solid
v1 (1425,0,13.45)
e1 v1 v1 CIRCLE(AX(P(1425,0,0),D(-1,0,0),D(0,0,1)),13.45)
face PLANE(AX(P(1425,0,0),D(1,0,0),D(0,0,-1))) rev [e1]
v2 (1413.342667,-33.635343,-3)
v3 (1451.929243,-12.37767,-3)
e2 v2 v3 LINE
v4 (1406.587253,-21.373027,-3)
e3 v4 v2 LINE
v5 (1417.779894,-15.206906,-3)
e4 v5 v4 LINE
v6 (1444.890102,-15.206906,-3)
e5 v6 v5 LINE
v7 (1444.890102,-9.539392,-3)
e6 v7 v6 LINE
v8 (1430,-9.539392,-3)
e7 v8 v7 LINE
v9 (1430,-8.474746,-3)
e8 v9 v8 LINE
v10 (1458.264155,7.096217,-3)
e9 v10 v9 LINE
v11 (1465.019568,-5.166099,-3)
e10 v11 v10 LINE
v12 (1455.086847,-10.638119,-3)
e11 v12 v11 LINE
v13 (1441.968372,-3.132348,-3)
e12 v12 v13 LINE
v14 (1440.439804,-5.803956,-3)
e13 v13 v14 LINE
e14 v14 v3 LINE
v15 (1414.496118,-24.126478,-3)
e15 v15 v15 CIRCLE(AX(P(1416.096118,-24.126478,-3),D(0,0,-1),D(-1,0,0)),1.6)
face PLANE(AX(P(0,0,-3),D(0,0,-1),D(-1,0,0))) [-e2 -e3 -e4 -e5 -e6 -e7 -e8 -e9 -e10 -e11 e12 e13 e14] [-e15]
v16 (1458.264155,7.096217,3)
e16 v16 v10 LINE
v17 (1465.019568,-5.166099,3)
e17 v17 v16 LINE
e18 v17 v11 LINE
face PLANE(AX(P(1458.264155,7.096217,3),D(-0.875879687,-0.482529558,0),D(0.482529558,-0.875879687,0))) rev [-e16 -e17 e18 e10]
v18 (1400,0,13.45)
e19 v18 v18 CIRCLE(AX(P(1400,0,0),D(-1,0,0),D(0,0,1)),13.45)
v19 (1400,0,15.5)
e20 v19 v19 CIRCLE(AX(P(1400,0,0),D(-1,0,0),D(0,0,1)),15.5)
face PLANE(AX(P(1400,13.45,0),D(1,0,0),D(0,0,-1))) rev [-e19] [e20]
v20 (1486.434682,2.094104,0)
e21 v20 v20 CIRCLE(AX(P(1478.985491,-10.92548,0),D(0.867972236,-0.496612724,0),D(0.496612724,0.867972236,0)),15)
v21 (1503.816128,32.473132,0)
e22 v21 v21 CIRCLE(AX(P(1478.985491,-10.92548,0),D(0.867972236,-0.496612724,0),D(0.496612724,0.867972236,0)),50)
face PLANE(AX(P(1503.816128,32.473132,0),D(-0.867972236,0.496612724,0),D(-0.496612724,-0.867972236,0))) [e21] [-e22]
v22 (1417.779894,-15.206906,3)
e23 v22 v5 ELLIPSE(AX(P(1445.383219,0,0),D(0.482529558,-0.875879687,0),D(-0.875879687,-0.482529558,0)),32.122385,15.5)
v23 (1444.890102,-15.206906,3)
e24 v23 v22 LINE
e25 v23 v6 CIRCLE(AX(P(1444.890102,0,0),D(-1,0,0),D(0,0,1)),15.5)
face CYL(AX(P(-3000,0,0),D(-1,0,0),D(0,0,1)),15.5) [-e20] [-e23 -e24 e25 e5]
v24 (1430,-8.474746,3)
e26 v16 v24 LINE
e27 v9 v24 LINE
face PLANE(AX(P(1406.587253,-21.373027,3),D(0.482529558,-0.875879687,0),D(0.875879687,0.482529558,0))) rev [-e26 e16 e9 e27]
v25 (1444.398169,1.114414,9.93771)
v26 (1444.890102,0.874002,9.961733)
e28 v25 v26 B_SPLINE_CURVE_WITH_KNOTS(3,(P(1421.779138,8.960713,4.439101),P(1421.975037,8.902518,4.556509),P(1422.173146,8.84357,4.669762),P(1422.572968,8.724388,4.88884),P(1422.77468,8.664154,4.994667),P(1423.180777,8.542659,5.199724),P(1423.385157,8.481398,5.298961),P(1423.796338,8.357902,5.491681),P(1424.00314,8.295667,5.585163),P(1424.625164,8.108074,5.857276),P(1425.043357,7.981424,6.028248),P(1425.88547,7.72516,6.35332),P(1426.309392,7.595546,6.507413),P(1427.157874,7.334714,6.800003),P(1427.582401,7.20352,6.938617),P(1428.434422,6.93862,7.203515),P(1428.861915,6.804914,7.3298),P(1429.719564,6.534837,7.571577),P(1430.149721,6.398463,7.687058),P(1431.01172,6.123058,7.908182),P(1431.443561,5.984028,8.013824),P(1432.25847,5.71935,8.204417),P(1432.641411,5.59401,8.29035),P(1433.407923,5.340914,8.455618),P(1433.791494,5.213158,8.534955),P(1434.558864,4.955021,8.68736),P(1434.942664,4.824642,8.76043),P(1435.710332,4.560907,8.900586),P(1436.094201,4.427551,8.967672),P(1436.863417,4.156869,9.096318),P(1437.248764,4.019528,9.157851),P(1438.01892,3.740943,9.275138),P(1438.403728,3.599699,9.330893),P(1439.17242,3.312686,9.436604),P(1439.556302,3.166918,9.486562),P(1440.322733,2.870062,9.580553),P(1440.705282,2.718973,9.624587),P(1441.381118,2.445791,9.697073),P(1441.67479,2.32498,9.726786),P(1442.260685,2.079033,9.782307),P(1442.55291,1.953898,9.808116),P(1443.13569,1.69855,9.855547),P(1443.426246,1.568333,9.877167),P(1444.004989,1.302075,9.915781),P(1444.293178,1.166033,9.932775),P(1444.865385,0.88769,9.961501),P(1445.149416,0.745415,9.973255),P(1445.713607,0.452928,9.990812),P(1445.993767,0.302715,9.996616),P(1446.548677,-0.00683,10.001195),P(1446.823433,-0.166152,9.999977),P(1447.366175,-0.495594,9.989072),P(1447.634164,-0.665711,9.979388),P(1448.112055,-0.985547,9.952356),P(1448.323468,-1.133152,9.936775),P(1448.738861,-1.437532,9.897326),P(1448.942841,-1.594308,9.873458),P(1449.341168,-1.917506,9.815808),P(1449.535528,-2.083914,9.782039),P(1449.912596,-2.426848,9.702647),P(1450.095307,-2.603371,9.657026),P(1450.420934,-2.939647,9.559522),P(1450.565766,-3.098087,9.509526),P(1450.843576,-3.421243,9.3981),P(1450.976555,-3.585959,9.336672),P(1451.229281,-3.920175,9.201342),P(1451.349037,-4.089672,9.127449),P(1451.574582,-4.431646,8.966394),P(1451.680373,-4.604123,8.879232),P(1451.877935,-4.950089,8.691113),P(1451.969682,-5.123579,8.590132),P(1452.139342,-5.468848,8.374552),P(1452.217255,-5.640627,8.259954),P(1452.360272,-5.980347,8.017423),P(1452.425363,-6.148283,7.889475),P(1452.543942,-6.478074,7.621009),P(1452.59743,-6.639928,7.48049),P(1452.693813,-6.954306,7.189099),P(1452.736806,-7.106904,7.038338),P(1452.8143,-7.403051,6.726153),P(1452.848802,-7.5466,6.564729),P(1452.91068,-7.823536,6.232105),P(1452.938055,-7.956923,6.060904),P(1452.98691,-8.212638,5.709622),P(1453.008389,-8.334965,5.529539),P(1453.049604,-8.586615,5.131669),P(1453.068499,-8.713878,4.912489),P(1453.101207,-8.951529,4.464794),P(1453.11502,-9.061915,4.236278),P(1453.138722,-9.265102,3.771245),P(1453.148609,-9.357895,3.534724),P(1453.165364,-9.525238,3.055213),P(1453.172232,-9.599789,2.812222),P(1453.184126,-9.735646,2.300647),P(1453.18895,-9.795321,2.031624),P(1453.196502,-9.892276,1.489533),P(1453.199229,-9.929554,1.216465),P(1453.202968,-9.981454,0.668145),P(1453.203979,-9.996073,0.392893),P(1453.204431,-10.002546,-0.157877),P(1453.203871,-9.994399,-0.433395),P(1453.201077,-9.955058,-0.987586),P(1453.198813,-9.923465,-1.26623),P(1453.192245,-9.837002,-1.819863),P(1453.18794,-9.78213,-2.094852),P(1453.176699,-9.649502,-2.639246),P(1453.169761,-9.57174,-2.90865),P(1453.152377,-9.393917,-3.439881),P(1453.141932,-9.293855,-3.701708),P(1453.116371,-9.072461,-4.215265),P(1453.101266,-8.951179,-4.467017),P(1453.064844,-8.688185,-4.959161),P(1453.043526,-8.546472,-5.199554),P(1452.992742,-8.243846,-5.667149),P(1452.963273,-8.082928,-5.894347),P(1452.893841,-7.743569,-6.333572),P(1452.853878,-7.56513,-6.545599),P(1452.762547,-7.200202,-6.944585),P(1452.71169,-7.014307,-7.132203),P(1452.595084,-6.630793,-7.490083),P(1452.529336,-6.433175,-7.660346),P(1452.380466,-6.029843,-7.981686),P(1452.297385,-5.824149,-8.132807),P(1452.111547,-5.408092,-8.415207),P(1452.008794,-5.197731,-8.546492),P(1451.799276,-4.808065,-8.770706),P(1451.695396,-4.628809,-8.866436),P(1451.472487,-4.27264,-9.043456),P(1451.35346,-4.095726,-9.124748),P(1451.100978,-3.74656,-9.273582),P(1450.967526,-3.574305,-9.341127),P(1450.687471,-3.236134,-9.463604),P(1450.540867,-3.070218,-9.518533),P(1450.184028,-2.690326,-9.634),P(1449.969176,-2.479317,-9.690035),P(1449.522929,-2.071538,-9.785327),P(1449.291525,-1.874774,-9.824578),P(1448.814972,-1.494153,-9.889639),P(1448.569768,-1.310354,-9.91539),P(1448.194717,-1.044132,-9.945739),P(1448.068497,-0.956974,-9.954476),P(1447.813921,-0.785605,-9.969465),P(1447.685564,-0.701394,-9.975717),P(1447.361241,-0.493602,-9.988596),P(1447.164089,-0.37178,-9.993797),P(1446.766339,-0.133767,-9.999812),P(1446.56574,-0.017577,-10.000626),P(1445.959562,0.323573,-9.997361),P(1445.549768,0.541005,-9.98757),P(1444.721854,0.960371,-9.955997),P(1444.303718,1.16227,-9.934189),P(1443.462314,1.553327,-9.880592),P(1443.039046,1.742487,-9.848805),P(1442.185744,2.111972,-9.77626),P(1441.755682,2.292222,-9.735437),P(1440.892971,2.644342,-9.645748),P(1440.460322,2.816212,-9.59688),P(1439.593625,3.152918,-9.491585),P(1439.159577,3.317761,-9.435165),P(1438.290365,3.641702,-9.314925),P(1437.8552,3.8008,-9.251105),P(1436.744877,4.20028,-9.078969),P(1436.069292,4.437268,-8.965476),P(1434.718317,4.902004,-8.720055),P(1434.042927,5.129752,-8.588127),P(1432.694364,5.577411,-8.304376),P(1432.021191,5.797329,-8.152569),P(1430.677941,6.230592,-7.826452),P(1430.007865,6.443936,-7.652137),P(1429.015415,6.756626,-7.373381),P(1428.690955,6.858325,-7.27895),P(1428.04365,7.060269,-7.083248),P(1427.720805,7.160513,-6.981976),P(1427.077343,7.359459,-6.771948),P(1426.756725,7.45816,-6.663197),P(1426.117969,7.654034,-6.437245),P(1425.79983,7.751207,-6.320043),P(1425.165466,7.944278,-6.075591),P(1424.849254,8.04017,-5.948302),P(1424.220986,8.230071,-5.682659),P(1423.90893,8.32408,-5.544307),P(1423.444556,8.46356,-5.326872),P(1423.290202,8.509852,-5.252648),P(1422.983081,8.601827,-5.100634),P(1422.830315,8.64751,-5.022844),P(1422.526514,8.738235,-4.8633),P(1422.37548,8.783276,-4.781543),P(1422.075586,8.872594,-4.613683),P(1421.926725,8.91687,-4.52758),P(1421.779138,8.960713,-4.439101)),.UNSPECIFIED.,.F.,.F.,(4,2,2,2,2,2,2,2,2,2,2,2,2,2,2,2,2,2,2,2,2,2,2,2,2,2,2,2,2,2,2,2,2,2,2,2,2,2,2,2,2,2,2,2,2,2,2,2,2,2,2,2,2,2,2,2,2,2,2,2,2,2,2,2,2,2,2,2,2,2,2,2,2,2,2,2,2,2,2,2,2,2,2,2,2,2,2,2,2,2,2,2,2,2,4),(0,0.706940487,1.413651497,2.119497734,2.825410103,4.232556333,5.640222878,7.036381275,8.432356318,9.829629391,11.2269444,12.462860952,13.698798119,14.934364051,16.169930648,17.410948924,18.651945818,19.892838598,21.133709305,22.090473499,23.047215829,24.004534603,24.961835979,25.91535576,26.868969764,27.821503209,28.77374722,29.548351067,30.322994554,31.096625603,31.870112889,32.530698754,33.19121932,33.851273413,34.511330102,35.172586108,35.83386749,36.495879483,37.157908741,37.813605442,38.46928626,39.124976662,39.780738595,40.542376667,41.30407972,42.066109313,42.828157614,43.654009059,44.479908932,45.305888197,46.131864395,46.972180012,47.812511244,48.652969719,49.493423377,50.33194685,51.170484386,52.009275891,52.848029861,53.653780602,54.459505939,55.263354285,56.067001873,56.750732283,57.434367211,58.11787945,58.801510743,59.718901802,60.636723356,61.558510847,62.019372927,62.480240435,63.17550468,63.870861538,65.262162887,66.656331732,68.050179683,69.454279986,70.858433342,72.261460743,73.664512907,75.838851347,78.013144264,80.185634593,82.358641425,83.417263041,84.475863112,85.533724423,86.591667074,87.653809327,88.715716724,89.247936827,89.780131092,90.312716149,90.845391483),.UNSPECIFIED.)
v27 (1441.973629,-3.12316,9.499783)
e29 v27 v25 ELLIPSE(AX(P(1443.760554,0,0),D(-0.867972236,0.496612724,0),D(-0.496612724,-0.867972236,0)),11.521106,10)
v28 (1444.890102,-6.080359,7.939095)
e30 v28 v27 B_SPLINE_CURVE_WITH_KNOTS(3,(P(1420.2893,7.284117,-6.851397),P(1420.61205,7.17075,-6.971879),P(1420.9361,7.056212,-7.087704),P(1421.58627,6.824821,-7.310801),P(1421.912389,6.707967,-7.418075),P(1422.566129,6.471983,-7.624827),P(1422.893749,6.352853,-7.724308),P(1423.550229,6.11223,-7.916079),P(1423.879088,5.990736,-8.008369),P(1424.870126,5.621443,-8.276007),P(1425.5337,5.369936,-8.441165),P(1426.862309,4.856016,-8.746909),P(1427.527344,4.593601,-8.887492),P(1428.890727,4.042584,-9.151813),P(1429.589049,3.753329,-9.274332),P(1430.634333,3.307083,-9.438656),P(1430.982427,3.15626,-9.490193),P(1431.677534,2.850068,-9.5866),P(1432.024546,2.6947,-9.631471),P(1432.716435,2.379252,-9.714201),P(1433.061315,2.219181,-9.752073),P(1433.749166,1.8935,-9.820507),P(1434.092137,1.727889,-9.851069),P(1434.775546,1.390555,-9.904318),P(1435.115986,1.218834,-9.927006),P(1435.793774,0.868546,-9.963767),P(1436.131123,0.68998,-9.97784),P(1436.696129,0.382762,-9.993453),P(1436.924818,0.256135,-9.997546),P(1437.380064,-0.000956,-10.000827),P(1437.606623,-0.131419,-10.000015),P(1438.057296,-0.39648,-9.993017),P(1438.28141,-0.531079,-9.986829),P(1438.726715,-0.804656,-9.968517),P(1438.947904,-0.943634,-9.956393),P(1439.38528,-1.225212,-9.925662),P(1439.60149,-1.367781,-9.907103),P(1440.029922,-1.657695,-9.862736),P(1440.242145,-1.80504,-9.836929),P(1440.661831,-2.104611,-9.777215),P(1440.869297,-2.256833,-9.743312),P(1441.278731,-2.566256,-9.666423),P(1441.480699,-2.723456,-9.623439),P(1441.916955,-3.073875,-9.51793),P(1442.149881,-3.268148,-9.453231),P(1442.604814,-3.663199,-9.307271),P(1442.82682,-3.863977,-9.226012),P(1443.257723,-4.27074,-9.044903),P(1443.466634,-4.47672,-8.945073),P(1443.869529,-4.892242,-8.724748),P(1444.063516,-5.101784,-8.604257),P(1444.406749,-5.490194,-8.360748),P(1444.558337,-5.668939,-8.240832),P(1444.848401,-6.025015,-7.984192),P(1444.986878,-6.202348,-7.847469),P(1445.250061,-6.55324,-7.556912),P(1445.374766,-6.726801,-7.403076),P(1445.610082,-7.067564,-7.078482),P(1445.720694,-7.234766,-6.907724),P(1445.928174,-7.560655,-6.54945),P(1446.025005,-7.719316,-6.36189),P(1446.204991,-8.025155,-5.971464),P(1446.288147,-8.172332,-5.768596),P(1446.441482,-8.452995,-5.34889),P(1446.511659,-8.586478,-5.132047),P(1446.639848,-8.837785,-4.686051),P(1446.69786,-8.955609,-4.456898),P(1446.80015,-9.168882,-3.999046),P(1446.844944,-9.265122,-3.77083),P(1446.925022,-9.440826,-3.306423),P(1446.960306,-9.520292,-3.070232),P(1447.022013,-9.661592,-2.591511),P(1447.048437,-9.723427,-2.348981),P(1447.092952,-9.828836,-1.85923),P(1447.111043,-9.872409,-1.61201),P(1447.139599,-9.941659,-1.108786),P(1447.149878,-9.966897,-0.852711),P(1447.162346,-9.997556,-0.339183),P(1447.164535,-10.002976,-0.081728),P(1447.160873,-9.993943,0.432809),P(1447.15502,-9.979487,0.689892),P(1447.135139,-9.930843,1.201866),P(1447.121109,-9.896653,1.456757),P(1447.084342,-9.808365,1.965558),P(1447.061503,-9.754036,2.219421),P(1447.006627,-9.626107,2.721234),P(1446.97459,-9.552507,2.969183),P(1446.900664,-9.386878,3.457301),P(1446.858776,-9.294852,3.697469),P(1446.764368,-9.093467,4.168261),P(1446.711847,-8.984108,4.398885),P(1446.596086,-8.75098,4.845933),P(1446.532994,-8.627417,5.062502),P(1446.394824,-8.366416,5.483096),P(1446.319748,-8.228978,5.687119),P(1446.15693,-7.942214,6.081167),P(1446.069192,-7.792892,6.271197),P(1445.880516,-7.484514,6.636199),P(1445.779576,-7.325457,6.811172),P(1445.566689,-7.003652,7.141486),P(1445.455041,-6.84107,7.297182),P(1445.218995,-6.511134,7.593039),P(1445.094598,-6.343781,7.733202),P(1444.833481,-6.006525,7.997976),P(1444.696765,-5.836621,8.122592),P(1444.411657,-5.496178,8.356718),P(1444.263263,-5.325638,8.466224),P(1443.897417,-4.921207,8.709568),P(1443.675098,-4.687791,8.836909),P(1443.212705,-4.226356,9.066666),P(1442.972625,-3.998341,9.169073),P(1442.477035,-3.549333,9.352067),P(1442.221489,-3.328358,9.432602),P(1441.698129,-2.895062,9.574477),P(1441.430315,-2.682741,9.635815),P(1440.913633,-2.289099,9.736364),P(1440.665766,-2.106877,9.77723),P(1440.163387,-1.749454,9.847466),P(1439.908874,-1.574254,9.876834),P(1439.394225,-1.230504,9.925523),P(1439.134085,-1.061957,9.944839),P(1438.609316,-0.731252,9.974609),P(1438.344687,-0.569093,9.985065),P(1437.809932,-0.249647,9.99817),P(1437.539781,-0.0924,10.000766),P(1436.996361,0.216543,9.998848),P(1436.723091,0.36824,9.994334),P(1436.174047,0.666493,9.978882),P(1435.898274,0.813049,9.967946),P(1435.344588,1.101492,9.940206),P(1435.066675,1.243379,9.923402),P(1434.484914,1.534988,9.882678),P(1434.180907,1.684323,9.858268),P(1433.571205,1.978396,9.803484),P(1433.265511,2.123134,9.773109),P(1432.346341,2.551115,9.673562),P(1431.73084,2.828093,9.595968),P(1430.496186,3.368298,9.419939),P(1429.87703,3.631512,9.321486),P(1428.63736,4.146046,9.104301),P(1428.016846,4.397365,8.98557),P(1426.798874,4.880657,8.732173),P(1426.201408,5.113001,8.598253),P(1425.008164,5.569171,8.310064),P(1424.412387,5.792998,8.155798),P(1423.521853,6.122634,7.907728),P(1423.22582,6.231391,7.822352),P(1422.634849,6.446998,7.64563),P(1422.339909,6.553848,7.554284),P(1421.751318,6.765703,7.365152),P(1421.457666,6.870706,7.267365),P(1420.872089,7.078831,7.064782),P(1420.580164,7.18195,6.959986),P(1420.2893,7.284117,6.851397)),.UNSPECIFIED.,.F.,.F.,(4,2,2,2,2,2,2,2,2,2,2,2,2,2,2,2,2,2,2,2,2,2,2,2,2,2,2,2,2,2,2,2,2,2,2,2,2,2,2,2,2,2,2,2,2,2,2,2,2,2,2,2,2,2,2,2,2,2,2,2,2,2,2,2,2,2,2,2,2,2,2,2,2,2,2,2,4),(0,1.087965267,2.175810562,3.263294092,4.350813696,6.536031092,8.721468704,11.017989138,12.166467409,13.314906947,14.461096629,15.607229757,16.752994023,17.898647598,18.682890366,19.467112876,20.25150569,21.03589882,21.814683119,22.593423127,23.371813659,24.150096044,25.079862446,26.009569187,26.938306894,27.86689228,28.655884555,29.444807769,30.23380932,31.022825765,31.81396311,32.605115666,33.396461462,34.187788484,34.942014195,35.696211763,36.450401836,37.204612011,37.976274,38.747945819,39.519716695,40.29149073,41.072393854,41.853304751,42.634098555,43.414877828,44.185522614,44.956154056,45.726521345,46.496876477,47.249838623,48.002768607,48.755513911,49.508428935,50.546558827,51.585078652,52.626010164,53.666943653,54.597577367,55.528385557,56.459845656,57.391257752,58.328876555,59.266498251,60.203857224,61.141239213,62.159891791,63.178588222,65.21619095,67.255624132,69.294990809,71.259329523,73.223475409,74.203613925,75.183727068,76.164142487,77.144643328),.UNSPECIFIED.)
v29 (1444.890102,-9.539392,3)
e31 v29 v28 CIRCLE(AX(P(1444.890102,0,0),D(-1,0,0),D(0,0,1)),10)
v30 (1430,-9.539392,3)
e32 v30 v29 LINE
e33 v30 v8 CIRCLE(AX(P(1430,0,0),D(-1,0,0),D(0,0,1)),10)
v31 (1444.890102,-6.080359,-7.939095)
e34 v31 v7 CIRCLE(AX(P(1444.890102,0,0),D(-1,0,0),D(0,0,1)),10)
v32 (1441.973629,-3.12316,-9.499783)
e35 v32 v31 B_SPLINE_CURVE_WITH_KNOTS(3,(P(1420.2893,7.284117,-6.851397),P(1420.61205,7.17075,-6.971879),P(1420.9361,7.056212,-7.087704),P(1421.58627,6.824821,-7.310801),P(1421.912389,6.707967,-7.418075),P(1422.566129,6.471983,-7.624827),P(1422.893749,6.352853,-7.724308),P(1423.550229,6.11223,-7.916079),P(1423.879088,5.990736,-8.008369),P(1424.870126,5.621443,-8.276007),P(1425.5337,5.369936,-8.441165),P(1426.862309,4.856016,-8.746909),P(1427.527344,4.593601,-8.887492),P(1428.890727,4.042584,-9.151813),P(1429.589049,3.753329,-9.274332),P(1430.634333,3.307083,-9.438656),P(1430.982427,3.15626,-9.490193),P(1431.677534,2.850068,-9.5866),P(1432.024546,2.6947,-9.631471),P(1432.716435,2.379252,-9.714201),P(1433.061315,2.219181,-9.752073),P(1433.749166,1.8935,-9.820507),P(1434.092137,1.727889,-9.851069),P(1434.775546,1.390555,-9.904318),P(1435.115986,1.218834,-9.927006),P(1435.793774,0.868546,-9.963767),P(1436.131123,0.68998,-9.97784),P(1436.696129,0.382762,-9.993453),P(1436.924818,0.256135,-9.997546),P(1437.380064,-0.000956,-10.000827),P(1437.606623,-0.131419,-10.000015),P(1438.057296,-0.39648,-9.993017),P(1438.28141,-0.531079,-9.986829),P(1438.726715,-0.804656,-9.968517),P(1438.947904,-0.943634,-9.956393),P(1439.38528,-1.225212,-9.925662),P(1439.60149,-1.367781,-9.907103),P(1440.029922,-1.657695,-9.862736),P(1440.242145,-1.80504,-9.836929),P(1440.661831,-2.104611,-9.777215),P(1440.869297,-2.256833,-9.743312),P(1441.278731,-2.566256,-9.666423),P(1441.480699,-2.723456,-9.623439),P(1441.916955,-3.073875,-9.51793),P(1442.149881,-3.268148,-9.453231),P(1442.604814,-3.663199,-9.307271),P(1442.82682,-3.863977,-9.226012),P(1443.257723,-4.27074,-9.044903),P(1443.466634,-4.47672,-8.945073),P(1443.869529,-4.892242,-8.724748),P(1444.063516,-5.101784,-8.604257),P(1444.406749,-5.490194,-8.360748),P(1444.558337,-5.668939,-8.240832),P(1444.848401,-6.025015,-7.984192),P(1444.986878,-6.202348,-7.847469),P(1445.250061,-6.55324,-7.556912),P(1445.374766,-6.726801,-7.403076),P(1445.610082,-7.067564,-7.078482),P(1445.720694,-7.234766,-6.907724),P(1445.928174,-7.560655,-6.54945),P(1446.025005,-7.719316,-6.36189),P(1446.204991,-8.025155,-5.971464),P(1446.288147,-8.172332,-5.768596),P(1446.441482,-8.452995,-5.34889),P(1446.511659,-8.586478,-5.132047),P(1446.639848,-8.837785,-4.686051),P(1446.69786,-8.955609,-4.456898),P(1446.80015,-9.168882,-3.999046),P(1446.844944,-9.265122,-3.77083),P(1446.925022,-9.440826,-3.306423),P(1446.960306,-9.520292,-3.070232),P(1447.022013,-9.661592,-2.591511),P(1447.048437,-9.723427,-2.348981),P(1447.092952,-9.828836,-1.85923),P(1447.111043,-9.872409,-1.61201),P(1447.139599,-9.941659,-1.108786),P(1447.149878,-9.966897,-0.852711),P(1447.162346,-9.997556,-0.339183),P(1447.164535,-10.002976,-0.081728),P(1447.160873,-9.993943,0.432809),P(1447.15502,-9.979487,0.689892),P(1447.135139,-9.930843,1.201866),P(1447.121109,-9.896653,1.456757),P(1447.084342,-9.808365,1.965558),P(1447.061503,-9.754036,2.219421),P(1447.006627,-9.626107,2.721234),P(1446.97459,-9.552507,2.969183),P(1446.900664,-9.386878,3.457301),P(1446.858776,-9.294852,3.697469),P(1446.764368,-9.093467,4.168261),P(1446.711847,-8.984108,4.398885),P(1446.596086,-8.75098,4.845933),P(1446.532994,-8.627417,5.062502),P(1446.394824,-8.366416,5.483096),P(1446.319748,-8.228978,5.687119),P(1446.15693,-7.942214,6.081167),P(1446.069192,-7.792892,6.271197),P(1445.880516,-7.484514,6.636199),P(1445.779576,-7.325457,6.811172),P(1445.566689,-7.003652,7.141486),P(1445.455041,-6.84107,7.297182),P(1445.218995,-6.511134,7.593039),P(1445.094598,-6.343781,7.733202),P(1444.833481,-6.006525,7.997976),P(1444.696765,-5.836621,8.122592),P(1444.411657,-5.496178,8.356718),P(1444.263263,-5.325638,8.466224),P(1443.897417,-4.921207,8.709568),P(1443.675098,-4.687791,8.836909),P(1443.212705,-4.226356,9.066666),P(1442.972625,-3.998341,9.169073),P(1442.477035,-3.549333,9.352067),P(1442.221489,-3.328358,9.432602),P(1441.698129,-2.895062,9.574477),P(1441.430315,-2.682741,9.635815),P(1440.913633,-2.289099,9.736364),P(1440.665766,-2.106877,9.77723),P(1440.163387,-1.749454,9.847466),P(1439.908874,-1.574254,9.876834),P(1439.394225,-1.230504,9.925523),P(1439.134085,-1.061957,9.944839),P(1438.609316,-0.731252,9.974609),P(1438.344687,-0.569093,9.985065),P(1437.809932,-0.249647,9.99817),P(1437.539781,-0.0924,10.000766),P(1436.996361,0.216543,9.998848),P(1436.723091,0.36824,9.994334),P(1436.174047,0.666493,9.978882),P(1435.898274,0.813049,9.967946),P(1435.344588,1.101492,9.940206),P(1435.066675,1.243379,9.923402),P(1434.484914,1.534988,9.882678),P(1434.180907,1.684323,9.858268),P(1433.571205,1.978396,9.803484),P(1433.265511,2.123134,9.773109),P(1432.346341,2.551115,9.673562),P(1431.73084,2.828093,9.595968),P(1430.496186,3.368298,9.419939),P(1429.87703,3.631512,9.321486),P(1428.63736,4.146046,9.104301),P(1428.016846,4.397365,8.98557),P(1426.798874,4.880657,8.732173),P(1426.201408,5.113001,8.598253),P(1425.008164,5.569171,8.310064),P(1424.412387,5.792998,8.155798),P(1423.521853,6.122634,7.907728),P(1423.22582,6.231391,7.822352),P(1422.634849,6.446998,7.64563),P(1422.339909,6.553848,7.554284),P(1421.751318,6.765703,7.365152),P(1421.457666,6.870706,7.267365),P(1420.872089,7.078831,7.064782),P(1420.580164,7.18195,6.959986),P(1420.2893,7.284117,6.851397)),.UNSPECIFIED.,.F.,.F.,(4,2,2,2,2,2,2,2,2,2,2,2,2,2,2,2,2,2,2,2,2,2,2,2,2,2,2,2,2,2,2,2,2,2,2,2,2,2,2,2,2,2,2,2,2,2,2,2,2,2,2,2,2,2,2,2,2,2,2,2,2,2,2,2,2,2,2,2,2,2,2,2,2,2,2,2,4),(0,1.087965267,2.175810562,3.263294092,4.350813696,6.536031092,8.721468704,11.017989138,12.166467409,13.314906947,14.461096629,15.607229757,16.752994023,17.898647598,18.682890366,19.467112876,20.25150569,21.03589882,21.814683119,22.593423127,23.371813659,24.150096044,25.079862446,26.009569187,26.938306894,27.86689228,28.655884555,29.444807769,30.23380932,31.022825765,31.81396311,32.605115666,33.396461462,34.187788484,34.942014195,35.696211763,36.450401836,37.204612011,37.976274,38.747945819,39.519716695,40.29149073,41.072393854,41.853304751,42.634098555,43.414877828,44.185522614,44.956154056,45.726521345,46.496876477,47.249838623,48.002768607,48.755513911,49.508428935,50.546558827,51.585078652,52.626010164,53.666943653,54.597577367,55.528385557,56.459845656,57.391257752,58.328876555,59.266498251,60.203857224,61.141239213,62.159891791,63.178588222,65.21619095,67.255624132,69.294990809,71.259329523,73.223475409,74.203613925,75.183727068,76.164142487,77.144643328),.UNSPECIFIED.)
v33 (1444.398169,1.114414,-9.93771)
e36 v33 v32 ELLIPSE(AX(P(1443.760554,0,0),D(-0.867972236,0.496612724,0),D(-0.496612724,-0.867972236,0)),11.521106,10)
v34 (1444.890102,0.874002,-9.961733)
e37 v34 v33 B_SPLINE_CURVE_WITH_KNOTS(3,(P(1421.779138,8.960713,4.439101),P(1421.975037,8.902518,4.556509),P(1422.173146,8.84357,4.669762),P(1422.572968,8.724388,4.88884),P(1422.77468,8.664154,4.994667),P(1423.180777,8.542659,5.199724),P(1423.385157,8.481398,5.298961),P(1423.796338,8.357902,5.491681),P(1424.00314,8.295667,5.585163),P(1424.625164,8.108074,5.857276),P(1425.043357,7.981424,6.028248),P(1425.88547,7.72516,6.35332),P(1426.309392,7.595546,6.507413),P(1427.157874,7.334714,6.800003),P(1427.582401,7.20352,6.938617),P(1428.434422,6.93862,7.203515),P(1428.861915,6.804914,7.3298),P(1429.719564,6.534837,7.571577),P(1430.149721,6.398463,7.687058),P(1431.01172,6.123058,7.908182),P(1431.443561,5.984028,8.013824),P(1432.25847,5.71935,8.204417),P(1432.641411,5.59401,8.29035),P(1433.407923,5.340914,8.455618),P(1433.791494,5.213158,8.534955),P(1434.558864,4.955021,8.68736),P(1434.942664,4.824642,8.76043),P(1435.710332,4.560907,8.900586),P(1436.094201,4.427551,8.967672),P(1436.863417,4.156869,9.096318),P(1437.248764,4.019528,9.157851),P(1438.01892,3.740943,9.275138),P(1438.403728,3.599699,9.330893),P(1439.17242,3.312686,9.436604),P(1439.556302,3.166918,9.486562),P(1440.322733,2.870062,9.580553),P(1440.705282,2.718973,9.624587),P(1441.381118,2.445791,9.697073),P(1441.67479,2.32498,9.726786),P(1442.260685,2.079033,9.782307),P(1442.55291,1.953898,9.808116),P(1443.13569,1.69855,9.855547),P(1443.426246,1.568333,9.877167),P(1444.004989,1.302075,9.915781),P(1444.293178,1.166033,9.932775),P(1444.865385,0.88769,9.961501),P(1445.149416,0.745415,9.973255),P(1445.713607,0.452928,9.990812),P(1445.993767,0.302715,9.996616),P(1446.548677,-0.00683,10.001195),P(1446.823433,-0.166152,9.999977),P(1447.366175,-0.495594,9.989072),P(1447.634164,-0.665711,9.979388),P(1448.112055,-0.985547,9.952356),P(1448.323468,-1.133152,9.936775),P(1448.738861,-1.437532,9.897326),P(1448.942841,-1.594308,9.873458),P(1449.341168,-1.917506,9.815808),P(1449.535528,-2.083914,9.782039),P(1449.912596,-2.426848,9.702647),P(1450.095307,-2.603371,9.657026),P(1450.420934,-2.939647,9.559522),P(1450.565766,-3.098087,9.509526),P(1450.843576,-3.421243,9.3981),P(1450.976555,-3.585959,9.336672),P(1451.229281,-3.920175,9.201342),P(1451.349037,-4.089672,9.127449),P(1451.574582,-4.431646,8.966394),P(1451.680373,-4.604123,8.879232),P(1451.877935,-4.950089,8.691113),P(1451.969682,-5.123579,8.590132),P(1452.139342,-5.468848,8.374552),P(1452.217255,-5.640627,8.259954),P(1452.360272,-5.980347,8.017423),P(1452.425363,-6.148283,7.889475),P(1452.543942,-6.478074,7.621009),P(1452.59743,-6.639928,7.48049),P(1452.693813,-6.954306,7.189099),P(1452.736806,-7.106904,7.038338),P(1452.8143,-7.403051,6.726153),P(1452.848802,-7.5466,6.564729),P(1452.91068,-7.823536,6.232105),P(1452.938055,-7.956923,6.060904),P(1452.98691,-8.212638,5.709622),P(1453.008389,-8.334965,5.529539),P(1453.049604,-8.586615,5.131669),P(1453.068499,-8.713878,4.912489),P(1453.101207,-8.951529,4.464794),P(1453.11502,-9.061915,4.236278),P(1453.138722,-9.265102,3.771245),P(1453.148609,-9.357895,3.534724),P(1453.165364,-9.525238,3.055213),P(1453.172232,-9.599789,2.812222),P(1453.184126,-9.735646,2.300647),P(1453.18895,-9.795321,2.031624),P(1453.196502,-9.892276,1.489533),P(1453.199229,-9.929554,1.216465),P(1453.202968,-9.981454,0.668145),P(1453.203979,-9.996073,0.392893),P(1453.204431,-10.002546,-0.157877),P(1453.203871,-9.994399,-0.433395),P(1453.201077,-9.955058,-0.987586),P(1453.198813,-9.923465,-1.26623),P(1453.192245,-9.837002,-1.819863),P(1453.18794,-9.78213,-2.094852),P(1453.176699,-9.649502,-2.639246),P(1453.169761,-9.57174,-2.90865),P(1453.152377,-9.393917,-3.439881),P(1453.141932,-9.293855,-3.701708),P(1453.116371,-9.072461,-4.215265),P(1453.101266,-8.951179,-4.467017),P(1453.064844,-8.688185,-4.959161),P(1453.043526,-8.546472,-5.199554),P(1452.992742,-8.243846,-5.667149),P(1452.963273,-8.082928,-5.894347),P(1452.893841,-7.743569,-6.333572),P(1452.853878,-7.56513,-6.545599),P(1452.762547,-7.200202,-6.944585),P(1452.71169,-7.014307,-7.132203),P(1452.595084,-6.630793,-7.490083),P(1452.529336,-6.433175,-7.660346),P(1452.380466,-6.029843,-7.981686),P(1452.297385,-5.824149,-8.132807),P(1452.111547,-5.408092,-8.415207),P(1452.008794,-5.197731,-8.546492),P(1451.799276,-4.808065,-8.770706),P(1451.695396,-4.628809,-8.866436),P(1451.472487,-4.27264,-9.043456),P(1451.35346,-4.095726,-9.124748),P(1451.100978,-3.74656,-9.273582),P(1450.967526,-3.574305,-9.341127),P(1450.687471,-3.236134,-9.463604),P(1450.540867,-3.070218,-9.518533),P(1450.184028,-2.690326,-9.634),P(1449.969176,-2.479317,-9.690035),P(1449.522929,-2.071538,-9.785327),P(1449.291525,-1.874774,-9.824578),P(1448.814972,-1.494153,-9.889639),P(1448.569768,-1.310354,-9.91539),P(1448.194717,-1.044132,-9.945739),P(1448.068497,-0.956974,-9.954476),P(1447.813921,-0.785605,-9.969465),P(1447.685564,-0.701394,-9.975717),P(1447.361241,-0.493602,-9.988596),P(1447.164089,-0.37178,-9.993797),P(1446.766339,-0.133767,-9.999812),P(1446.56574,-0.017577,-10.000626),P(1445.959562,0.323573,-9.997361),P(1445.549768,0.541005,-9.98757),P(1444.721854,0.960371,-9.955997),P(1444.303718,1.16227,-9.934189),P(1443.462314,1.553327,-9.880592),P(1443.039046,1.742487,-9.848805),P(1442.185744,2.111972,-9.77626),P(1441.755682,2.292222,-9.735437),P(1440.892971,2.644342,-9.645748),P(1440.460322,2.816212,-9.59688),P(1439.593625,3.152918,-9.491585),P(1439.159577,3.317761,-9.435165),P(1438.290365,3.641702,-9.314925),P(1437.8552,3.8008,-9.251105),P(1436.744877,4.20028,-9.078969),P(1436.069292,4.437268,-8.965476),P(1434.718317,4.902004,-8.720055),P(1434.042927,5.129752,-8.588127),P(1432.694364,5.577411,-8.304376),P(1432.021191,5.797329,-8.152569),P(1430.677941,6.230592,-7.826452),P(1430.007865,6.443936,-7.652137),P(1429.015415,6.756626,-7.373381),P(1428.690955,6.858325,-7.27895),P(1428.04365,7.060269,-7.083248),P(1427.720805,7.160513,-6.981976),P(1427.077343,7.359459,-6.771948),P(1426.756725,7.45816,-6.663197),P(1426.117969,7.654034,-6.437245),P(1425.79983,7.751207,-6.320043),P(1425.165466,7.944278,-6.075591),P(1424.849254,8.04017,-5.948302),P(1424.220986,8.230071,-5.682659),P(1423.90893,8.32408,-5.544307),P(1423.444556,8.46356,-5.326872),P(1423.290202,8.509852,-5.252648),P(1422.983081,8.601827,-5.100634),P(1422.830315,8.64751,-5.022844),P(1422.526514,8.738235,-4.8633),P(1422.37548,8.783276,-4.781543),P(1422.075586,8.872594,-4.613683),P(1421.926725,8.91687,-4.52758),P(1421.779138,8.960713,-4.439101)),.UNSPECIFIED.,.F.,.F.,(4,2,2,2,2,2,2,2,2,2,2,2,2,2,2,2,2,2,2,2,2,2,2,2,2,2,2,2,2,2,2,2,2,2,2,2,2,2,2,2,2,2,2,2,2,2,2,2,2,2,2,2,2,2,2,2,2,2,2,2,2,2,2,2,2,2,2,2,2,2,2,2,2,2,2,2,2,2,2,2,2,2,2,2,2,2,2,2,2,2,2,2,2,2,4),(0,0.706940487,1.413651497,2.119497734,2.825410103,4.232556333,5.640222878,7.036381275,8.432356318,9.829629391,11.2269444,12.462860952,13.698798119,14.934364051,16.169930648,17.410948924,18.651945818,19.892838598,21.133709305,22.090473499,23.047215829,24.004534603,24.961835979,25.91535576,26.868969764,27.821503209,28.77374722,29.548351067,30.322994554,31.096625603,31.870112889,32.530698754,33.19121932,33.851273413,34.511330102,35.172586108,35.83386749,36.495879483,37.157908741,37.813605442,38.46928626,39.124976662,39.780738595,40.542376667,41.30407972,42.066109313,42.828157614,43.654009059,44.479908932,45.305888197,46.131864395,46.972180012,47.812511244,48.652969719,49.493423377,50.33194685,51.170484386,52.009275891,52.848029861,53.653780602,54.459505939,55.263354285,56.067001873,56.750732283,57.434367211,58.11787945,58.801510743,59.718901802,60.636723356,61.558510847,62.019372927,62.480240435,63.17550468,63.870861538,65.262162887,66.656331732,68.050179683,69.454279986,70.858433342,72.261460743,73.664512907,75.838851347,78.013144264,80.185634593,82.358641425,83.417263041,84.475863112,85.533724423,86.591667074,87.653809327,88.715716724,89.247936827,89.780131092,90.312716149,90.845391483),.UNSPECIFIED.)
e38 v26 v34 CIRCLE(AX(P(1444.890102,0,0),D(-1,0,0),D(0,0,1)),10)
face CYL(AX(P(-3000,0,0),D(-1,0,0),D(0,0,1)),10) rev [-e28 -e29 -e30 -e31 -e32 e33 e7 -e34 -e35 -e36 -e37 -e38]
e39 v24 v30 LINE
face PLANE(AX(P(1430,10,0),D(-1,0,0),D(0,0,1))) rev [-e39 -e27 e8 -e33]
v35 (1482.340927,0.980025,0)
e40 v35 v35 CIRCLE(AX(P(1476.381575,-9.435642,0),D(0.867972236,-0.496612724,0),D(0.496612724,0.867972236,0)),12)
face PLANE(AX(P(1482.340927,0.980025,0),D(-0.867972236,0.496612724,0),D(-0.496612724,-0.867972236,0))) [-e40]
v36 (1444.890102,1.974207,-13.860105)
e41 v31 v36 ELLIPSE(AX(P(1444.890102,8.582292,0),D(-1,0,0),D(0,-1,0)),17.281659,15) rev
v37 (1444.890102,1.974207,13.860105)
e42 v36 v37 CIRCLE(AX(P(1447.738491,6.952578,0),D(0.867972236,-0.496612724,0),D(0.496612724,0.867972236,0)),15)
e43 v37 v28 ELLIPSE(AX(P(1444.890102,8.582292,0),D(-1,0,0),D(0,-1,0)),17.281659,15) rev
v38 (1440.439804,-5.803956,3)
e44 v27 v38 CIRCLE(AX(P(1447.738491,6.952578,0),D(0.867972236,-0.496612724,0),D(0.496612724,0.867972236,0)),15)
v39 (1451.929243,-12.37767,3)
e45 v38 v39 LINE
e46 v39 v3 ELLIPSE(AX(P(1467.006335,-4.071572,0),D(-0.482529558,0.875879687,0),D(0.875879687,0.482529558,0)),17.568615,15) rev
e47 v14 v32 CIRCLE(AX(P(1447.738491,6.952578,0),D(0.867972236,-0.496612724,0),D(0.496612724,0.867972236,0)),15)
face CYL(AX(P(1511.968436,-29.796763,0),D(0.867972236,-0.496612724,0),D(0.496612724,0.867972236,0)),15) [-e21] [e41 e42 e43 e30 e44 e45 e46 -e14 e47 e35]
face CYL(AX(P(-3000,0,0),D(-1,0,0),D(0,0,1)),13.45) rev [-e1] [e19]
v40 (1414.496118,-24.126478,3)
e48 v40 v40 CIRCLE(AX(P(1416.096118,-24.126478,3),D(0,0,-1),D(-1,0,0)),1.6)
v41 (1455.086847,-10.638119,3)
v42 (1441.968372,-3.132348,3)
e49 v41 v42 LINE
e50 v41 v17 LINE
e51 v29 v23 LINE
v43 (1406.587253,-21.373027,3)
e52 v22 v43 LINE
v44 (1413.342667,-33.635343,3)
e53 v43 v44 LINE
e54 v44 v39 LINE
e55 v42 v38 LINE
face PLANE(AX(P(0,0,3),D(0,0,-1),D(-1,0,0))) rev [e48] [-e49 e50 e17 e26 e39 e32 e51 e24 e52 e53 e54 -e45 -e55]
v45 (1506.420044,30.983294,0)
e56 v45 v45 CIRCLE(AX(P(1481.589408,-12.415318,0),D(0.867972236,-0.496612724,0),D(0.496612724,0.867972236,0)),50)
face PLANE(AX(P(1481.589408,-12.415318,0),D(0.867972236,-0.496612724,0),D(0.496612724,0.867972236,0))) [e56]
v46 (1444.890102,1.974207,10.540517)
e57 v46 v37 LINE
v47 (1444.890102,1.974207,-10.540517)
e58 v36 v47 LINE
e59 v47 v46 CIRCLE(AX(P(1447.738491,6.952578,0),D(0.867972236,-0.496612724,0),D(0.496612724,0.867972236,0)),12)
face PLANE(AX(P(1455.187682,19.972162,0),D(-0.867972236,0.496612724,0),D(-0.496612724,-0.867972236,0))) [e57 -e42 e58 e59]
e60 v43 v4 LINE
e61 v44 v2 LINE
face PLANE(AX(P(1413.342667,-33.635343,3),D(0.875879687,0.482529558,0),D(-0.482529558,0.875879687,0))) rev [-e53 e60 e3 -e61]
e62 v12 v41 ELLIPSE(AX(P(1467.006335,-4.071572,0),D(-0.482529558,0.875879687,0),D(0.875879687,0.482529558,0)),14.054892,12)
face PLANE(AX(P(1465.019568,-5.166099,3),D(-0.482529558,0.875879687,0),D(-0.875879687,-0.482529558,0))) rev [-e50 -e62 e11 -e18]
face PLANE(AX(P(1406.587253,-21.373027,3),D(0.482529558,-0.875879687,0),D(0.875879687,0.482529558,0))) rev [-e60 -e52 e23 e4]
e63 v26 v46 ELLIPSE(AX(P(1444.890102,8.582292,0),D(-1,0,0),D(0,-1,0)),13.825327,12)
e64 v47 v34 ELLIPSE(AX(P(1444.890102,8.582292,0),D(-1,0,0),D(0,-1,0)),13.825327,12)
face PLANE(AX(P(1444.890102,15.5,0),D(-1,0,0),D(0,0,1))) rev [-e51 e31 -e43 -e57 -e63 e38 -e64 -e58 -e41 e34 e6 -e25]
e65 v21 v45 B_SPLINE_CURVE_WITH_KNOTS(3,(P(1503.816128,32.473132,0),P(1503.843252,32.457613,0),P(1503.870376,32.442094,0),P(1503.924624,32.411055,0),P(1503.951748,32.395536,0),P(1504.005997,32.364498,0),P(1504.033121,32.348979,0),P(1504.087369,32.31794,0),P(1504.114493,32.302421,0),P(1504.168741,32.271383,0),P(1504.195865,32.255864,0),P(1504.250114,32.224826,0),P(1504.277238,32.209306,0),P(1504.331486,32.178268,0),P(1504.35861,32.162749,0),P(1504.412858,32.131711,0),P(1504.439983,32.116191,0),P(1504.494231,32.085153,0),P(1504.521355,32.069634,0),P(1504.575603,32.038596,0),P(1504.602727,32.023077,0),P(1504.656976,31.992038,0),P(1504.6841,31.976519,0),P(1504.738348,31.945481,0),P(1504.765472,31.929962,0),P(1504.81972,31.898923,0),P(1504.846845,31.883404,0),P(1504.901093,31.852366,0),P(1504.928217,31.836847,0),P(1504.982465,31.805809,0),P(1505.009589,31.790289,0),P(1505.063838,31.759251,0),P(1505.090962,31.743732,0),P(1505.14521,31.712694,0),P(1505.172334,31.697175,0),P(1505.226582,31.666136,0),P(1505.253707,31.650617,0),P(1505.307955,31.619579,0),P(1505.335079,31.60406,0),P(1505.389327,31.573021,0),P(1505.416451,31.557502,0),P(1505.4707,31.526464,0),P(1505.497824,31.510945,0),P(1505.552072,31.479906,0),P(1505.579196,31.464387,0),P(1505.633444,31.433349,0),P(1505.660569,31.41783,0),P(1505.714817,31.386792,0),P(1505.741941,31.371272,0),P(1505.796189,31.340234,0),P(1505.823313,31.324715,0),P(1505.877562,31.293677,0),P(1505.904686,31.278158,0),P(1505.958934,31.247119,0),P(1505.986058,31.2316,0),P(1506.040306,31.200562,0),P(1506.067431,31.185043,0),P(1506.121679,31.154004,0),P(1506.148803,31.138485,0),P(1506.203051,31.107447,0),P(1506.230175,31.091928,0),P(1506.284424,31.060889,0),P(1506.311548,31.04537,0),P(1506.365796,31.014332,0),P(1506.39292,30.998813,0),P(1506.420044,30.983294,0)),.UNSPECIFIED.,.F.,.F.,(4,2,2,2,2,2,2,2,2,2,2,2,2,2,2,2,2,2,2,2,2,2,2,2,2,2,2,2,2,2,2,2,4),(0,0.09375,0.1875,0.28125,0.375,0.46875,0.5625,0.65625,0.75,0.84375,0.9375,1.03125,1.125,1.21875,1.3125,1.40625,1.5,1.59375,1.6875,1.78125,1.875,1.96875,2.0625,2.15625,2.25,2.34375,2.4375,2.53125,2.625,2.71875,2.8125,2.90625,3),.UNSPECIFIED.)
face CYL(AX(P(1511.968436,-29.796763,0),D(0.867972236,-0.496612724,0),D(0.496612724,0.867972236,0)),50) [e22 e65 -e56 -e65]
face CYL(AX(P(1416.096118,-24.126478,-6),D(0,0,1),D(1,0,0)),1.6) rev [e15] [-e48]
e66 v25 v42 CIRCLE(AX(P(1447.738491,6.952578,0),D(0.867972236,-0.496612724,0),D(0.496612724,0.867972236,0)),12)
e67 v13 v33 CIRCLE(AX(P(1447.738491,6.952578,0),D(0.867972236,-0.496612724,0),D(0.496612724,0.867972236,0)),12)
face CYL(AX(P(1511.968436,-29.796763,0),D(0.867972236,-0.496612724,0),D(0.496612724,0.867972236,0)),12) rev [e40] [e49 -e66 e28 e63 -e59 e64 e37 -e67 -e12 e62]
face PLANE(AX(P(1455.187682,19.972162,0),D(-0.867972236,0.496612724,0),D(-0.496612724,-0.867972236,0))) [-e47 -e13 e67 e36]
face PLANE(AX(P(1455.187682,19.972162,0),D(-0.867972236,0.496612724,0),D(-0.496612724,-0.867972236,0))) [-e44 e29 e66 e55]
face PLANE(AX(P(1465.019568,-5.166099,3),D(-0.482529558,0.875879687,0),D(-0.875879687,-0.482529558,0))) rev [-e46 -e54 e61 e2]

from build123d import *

# Parameters (mm, degrees)
TAB_DEPTH               = 3
CABLE_PIN_HOLE_SKETCH_R = 1.6
CABLE_PIN_HOLE_DEPTH    = 6
BORE_CLEAR_SKETCH_W     = 26
BORE_CLEAR_SKETCH_H     = 13.45


with BuildPart() as part:
    # Pad And Pedestal Sketch → Pad And Pedestal (revolve)
    with BuildSketch(Plane.XY):
        Polygon((1481.589408105, -12.415318093), (1506.420044292, 30.983293711), (1503.816127584, 32.473131883), (1486.434682253, 2.094103619), (1455.187681754, 19.972161674), (1453.697843582, 17.368244965), (1482.340927374, 0.980025082), (1476.381574689, -9.435641751), align=None)
    revolve(axis=Axis((1511.968436369, -29.796763424, 0), (-0.8679722360942783, 0.4966127237289622, 0)))

    # Socket Sketch → Socket (revolve)
    with BuildSketch(Plane.XY):
        Polygon((1400, 13.45), (1400, 15.5), (1444.890102203, 15.5), (1444.890102203, 10), (1430, 10), (1430, 0), (1425, 0), (1425, 13.45), align=None)
    revolve(axis=Axis((-3000, 0, 0), (1, 0, 0)))

    # Tab Sketch → Tab (add, symmetric)
    with BuildSketch(Plane.XY):
        Polygon((1465.019568481, -5.166098693), (1413.342666954, -33.635342599), (1406.587253146, -21.373026982), (1458.264154673, 7.096216924), align=None)
    extrude(amount=TAB_DEPTH, both=True)

    # Cable Pin Hole Sketch → Cable Pin Hole (cut, symmetric)
    with BuildSketch(Plane.XY):
        with Locations((1416.096117858, -24.126477887)):
            Circle(CABLE_PIN_HOLE_SKETCH_R)
    extrude(amount=CABLE_PIN_HOLE_DEPTH, both=True, mode=Mode.SUBTRACT)

    # Bore Clear Sketch → Bore Clear (revolve, cut)
    with BuildSketch(Plane.XY):
        with Locations((1412, 6.725)):
            Rectangle(BORE_CLEAR_SKETCH_W, BORE_CLEAR_SKETCH_H)
    revolve(axis=Axis((-3000, 0, 0), (1, 0, 0)), mode=Mode.SUBTRACT)


solid = part.part
